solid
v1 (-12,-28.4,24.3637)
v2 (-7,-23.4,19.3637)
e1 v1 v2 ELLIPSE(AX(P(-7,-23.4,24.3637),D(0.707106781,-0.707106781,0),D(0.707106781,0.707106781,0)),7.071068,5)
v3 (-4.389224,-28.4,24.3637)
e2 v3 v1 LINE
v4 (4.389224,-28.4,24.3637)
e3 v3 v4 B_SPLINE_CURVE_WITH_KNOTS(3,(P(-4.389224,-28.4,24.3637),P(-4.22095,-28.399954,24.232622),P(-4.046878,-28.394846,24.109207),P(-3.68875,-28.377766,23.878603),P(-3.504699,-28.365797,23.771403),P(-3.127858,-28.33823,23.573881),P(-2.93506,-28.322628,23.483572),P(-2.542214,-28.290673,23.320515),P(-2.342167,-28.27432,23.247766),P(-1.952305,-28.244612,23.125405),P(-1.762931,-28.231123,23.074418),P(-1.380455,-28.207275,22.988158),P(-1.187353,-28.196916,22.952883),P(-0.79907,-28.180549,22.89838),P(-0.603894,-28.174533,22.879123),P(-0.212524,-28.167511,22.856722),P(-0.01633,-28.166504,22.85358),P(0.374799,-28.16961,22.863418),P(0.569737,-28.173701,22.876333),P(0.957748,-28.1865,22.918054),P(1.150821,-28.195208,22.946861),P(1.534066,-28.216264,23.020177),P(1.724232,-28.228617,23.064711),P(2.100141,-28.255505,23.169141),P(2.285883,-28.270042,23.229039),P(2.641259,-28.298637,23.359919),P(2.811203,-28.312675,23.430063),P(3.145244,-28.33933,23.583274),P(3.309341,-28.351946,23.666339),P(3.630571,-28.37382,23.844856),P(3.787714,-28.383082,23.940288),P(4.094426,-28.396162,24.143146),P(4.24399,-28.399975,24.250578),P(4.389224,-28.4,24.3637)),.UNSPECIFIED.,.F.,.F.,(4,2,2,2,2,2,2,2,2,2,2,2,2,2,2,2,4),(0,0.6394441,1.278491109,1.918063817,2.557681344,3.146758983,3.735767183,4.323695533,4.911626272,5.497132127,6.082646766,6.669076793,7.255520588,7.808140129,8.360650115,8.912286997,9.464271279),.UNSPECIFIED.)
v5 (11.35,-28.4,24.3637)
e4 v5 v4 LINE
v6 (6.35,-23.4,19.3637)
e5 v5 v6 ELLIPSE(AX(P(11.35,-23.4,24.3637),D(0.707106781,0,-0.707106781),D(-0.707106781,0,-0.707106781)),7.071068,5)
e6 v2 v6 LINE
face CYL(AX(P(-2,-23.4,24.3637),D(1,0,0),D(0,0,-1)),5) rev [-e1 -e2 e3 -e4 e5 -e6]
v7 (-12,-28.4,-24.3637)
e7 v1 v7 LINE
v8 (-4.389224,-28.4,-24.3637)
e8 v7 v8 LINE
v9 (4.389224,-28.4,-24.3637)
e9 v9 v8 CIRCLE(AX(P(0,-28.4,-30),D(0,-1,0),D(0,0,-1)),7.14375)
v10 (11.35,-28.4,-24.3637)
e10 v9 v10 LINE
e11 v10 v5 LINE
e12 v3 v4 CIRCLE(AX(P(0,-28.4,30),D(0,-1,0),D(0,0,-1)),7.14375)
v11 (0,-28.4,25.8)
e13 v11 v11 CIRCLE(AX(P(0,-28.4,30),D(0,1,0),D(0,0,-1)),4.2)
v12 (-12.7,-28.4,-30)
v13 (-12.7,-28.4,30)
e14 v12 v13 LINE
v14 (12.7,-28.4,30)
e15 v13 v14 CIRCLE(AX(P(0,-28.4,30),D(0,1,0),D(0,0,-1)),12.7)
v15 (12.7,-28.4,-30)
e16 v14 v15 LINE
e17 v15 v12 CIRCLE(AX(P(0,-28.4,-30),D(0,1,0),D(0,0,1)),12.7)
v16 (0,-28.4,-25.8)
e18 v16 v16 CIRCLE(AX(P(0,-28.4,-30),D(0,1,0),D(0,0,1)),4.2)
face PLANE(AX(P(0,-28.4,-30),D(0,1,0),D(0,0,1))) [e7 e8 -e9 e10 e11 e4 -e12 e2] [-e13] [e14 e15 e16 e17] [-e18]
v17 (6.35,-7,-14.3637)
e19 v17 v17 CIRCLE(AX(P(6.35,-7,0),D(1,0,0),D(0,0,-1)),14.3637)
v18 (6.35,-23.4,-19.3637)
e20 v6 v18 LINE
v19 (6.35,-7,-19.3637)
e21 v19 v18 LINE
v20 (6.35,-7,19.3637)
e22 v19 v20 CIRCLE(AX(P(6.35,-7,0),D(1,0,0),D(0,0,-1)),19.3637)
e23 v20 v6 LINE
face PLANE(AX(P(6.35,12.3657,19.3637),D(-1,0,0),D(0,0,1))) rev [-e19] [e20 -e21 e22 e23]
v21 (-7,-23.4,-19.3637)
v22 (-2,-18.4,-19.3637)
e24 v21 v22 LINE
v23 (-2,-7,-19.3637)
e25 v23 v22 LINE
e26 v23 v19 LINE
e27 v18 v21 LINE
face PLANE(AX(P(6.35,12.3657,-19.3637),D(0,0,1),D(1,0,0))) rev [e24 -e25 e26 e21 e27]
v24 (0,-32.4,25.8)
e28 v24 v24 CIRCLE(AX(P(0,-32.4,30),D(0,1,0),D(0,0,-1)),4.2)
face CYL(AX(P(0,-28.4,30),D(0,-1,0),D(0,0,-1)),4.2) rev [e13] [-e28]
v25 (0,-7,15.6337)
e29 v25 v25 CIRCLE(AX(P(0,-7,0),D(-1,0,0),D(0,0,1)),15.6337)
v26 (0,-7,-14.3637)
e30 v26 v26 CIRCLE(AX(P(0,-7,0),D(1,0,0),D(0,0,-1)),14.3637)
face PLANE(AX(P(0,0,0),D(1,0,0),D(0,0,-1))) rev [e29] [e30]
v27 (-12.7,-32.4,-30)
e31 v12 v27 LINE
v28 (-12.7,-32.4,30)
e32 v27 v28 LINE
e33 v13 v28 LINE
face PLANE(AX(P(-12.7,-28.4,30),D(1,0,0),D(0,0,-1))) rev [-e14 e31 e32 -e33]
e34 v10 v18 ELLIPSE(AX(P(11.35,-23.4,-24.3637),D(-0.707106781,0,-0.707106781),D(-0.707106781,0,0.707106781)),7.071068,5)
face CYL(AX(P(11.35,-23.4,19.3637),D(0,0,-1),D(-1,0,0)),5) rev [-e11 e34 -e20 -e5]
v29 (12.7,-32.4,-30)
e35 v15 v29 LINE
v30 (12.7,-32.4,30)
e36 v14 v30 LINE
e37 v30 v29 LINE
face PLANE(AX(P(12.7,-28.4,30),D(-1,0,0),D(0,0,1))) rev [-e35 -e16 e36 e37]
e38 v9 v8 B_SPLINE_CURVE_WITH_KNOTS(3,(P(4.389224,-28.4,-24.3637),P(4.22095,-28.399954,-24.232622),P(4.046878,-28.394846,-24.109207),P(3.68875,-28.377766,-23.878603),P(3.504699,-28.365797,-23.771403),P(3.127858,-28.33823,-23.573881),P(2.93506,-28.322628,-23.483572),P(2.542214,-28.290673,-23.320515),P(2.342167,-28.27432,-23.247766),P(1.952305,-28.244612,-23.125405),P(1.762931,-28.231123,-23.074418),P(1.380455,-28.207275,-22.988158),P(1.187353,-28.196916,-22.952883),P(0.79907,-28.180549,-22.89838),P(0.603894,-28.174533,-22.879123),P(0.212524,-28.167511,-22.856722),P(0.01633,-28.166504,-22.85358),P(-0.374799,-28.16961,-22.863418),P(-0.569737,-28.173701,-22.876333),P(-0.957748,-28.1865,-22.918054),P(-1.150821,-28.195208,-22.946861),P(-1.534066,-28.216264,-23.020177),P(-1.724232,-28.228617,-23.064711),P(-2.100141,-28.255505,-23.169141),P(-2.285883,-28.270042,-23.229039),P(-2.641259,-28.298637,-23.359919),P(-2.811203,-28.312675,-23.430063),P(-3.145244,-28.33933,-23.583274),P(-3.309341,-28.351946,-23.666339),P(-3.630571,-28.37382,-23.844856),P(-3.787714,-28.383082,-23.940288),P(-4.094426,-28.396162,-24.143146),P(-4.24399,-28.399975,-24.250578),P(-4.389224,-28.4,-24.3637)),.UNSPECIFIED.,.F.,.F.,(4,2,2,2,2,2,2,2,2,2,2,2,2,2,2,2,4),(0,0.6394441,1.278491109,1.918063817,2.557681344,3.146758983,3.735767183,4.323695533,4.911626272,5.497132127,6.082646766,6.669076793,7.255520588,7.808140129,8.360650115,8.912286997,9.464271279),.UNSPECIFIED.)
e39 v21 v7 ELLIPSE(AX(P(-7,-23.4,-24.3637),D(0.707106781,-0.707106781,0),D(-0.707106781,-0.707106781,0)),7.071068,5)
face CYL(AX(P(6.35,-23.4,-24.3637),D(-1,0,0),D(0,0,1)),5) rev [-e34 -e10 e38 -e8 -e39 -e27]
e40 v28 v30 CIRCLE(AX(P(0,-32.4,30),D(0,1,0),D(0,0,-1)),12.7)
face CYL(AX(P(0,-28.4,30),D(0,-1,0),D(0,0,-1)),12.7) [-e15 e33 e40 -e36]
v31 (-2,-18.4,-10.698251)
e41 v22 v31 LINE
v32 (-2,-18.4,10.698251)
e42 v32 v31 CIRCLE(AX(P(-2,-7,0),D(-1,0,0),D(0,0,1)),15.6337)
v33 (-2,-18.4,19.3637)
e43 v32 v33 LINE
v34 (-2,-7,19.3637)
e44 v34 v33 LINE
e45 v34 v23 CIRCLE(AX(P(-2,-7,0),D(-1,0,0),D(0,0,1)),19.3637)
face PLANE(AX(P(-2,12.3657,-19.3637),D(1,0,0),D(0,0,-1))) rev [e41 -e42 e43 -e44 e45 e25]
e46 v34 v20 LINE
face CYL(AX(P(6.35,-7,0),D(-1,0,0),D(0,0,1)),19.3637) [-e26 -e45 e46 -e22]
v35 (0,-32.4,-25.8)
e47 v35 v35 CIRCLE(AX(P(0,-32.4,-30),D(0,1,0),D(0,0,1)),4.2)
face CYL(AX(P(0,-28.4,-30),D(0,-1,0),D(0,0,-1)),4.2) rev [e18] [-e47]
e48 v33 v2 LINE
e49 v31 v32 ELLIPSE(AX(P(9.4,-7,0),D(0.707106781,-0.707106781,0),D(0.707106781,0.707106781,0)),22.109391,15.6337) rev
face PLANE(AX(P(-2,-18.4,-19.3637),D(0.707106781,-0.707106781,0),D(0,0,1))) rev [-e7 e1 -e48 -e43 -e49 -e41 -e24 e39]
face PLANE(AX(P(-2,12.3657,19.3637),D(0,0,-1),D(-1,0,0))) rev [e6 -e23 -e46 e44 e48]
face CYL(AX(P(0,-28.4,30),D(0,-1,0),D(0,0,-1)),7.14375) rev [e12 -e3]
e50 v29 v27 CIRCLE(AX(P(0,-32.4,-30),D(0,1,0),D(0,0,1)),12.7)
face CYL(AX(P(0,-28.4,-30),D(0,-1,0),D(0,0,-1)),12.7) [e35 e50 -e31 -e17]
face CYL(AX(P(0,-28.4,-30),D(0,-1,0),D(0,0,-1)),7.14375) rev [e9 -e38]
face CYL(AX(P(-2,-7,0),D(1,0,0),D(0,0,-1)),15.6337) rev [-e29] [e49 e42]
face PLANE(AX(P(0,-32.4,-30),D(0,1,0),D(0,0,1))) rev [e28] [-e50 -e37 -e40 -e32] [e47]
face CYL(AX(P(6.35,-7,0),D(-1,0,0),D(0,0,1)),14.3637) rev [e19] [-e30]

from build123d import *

# Parameters (mm, degrees)
SKETCH1_R                          = 19.3637
SKETCH1_R_2                        = 14.3637
MOTOR_FACE_AND_SCREW_EXTRUDE_DEPTH = 6.35
BOSS_EXTRUDE4_START                = 2
SKETCH7_R                          = 19.3637
SKETCH7_R_2                        = 15.6337
BOSS_EXTRUDE4_DEPTH                = 2
SKETCH3_R                          = 4.2
BOSS_EXTRUDE3_DEPTH                = 4
BOSS_EXTRUDE5_REACH                = 62.384
BOSS_EXTRUDE5_END_RADIUS           = 19.3637
SKETCH8_W                          = 8.35
SKETCH8_H                          = 38.7274
CHAMFER1_SIZE                      = 10
FILLET1_R                          = 5
SKETCH6_W                          = 7.14375
SKETCH6_H                          = 40.7637
F_1_0MM_DOWEL_HOLE1_AT_2_COUNT     = 2
F_1_0MM_DOWEL_HOLE1_AT_2_PITCH     = 60


with BuildPart() as part:
    # Sketch1 → Motor face and screw extrude (new body)
    with BuildSketch(Plane(origin=(0, 0, 0), x_dir=(0, 0, -1), z_dir=(1, 0, 0))):
        with Locations((0, -7)):
            Circle(SKETCH1_R)
        with Locations((0, -7)):
            Circle(SKETCH1_R_2, mode=Mode.SUBTRACT)
    extrude(amount=MOTOR_FACE_AND_SCREW_EXTRUDE_DEPTH)

    # Sketch7 → Boss-Extrude4 (add)
    with BuildSketch(Plane.ZY.offset(BOSS_EXTRUDE4_START)):
        with Locations((0, -7)):
            Circle(SKETCH7_R)
        with Locations((0, -7)):
            Circle(SKETCH7_R_2, mode=Mode.SUBTRACT)
    extrude(amount=-BOSS_EXTRUDE4_DEPTH)



with BuildPart() as body_2:
    # Sketch3 → Boss-Extrude3 (new body)
    with BuildSketch(Plane(origin=(0, -32.4, 0), x_dir=(1, 0, 0), z_dir=(0, 1, 0))):
        with BuildLine():
            Line((-12.7, -30), (-12.7, 30))
            ThreePointArc((-12.7, 30), (0, 42.7), (12.7, 30))
            Line((12.7, 30), (12.7, -30))
            ThreePointArc((12.7, -30), (0, -42.7), (-12.7, -30))
        make_face()
        with Locations(Location((0, 30, 0), (0, 0, 270))):
            Circle(SKETCH3_R, mode=Mode.SUBTRACT)
        with Locations(Location((0, -30, 0), (0, 0, 90))):
            Circle(SKETCH3_R, mode=Mode.SUBTRACT)
    extrude(amount=BOSS_EXTRUDE3_DEPTH)


with BuildPart() as part_1:
    add(part.part)

    add(body_2.part)  # Boss-Extrude5 merges body 2
    # Boss-Extrude5: up to this cylinder (the profile starts outside it)
    boss_extrude5_end = Plane(origin=(2.175, -7, 0), z_dir=(-1, 0, 0)) * Cylinder(BOSS_EXTRUDE5_END_RADIUS, 164.4954, mode=Mode.PRIVATE)
    # Sketch8 → Boss-Extrude5 (add, up to the surface)
    with BuildSketch(Plane(origin=(0, -28.4, 0), x_dir=(1, 0, 0), z_dir=(0, 1, 0)), mode=Mode.PRIVATE) as boss_extrude5_sk1:
        with Locations((2.175, 0)):
            Rectangle(SKETCH8_W, SKETCH8_H)
    boss_extrude5_tool1 = extrude(boss_extrude5_sk1.sketch, amount=BOSS_EXTRUDE5_REACH, mode=Mode.PRIVATE) - boss_extrude5_end
    add(boss_extrude5_tool1.solids().sort_by_distance((2.175, -28.4, 0))[0])

    # Chamfer1
    # the kernel refuses this chamfer: 10 mm, written as the material it adds along each edge
    with BuildSketch(Plane(origin=(-2, -28.4, -19.3637), x_dir=(-0.9996219169112968, -0.027495876610586317, 0), z_dir=(0, 0, 1))) as chamfer1_piece_1_section:
        Polygon((CHAMFER1_SIZE * 0.999621916911, -CHAMFER1_SIZE * 0.0274958766106), (-CHAMFER1_SIZE * 0.0274958766106, -CHAMFER1_SIZE * 0.999621916911), (0, 0), align=None)
    chamfer1_piece_1 = extrude(amount=38.7274, mode=Mode.PRIVATE)
    chamfer1_piece_1 = chamfer1_piece_1 - Plane(origin=(-3.620762983, -7, 0), x_dir=(0, 0, 1), z_dir=(-1, 0, 0)) * Cylinder(15.6337, 118, mode=Mode.PRIVATE)
    add(chamfer1_piece_1)

    # Fillet1
    fillet1_edges = [part_1.edges().sort_by_distance(p)[0] for p in [
        (-2.825, -28.4, -19.3637),
        (6.35, -28.4, 0),
        (-2.825, -28.4, 19.3637),
    ]]
    fillet(fillet1_edges, radius=FILLET1_R)

    # Sketch6 → Ø1.0mm Dowel Hole1 (revolve, cut)
    with BuildSketch(Plane(origin=(0, -28.4, 30), x_dir=(0, 0, -1), z_dir=(1, 0, 0))):
        with Locations((3.571875, 20.38185)):
            Rectangle(SKETCH6_W, SKETCH6_H)
    f_1_0mm_dowel_hole1 = revolve(axis=Axis((0, -34.75, 30), (0, 1, 0)), mode=Mode.SUBTRACT)

    # Ø1.0mm Dowel Hole1 at 2: Ø1.0mm Dowel Hole1 ×2
    with Locations(*[(0, 0, -i * F_1_0MM_DOWEL_HOLE1_AT_2_PITCH) for i in range(1, F_1_0MM_DOWEL_HOLE1_AT_2_COUNT)]):
        add(f_1_0mm_dowel_hole1, mode=Mode.SUBTRACT)


solid = part_1.part
